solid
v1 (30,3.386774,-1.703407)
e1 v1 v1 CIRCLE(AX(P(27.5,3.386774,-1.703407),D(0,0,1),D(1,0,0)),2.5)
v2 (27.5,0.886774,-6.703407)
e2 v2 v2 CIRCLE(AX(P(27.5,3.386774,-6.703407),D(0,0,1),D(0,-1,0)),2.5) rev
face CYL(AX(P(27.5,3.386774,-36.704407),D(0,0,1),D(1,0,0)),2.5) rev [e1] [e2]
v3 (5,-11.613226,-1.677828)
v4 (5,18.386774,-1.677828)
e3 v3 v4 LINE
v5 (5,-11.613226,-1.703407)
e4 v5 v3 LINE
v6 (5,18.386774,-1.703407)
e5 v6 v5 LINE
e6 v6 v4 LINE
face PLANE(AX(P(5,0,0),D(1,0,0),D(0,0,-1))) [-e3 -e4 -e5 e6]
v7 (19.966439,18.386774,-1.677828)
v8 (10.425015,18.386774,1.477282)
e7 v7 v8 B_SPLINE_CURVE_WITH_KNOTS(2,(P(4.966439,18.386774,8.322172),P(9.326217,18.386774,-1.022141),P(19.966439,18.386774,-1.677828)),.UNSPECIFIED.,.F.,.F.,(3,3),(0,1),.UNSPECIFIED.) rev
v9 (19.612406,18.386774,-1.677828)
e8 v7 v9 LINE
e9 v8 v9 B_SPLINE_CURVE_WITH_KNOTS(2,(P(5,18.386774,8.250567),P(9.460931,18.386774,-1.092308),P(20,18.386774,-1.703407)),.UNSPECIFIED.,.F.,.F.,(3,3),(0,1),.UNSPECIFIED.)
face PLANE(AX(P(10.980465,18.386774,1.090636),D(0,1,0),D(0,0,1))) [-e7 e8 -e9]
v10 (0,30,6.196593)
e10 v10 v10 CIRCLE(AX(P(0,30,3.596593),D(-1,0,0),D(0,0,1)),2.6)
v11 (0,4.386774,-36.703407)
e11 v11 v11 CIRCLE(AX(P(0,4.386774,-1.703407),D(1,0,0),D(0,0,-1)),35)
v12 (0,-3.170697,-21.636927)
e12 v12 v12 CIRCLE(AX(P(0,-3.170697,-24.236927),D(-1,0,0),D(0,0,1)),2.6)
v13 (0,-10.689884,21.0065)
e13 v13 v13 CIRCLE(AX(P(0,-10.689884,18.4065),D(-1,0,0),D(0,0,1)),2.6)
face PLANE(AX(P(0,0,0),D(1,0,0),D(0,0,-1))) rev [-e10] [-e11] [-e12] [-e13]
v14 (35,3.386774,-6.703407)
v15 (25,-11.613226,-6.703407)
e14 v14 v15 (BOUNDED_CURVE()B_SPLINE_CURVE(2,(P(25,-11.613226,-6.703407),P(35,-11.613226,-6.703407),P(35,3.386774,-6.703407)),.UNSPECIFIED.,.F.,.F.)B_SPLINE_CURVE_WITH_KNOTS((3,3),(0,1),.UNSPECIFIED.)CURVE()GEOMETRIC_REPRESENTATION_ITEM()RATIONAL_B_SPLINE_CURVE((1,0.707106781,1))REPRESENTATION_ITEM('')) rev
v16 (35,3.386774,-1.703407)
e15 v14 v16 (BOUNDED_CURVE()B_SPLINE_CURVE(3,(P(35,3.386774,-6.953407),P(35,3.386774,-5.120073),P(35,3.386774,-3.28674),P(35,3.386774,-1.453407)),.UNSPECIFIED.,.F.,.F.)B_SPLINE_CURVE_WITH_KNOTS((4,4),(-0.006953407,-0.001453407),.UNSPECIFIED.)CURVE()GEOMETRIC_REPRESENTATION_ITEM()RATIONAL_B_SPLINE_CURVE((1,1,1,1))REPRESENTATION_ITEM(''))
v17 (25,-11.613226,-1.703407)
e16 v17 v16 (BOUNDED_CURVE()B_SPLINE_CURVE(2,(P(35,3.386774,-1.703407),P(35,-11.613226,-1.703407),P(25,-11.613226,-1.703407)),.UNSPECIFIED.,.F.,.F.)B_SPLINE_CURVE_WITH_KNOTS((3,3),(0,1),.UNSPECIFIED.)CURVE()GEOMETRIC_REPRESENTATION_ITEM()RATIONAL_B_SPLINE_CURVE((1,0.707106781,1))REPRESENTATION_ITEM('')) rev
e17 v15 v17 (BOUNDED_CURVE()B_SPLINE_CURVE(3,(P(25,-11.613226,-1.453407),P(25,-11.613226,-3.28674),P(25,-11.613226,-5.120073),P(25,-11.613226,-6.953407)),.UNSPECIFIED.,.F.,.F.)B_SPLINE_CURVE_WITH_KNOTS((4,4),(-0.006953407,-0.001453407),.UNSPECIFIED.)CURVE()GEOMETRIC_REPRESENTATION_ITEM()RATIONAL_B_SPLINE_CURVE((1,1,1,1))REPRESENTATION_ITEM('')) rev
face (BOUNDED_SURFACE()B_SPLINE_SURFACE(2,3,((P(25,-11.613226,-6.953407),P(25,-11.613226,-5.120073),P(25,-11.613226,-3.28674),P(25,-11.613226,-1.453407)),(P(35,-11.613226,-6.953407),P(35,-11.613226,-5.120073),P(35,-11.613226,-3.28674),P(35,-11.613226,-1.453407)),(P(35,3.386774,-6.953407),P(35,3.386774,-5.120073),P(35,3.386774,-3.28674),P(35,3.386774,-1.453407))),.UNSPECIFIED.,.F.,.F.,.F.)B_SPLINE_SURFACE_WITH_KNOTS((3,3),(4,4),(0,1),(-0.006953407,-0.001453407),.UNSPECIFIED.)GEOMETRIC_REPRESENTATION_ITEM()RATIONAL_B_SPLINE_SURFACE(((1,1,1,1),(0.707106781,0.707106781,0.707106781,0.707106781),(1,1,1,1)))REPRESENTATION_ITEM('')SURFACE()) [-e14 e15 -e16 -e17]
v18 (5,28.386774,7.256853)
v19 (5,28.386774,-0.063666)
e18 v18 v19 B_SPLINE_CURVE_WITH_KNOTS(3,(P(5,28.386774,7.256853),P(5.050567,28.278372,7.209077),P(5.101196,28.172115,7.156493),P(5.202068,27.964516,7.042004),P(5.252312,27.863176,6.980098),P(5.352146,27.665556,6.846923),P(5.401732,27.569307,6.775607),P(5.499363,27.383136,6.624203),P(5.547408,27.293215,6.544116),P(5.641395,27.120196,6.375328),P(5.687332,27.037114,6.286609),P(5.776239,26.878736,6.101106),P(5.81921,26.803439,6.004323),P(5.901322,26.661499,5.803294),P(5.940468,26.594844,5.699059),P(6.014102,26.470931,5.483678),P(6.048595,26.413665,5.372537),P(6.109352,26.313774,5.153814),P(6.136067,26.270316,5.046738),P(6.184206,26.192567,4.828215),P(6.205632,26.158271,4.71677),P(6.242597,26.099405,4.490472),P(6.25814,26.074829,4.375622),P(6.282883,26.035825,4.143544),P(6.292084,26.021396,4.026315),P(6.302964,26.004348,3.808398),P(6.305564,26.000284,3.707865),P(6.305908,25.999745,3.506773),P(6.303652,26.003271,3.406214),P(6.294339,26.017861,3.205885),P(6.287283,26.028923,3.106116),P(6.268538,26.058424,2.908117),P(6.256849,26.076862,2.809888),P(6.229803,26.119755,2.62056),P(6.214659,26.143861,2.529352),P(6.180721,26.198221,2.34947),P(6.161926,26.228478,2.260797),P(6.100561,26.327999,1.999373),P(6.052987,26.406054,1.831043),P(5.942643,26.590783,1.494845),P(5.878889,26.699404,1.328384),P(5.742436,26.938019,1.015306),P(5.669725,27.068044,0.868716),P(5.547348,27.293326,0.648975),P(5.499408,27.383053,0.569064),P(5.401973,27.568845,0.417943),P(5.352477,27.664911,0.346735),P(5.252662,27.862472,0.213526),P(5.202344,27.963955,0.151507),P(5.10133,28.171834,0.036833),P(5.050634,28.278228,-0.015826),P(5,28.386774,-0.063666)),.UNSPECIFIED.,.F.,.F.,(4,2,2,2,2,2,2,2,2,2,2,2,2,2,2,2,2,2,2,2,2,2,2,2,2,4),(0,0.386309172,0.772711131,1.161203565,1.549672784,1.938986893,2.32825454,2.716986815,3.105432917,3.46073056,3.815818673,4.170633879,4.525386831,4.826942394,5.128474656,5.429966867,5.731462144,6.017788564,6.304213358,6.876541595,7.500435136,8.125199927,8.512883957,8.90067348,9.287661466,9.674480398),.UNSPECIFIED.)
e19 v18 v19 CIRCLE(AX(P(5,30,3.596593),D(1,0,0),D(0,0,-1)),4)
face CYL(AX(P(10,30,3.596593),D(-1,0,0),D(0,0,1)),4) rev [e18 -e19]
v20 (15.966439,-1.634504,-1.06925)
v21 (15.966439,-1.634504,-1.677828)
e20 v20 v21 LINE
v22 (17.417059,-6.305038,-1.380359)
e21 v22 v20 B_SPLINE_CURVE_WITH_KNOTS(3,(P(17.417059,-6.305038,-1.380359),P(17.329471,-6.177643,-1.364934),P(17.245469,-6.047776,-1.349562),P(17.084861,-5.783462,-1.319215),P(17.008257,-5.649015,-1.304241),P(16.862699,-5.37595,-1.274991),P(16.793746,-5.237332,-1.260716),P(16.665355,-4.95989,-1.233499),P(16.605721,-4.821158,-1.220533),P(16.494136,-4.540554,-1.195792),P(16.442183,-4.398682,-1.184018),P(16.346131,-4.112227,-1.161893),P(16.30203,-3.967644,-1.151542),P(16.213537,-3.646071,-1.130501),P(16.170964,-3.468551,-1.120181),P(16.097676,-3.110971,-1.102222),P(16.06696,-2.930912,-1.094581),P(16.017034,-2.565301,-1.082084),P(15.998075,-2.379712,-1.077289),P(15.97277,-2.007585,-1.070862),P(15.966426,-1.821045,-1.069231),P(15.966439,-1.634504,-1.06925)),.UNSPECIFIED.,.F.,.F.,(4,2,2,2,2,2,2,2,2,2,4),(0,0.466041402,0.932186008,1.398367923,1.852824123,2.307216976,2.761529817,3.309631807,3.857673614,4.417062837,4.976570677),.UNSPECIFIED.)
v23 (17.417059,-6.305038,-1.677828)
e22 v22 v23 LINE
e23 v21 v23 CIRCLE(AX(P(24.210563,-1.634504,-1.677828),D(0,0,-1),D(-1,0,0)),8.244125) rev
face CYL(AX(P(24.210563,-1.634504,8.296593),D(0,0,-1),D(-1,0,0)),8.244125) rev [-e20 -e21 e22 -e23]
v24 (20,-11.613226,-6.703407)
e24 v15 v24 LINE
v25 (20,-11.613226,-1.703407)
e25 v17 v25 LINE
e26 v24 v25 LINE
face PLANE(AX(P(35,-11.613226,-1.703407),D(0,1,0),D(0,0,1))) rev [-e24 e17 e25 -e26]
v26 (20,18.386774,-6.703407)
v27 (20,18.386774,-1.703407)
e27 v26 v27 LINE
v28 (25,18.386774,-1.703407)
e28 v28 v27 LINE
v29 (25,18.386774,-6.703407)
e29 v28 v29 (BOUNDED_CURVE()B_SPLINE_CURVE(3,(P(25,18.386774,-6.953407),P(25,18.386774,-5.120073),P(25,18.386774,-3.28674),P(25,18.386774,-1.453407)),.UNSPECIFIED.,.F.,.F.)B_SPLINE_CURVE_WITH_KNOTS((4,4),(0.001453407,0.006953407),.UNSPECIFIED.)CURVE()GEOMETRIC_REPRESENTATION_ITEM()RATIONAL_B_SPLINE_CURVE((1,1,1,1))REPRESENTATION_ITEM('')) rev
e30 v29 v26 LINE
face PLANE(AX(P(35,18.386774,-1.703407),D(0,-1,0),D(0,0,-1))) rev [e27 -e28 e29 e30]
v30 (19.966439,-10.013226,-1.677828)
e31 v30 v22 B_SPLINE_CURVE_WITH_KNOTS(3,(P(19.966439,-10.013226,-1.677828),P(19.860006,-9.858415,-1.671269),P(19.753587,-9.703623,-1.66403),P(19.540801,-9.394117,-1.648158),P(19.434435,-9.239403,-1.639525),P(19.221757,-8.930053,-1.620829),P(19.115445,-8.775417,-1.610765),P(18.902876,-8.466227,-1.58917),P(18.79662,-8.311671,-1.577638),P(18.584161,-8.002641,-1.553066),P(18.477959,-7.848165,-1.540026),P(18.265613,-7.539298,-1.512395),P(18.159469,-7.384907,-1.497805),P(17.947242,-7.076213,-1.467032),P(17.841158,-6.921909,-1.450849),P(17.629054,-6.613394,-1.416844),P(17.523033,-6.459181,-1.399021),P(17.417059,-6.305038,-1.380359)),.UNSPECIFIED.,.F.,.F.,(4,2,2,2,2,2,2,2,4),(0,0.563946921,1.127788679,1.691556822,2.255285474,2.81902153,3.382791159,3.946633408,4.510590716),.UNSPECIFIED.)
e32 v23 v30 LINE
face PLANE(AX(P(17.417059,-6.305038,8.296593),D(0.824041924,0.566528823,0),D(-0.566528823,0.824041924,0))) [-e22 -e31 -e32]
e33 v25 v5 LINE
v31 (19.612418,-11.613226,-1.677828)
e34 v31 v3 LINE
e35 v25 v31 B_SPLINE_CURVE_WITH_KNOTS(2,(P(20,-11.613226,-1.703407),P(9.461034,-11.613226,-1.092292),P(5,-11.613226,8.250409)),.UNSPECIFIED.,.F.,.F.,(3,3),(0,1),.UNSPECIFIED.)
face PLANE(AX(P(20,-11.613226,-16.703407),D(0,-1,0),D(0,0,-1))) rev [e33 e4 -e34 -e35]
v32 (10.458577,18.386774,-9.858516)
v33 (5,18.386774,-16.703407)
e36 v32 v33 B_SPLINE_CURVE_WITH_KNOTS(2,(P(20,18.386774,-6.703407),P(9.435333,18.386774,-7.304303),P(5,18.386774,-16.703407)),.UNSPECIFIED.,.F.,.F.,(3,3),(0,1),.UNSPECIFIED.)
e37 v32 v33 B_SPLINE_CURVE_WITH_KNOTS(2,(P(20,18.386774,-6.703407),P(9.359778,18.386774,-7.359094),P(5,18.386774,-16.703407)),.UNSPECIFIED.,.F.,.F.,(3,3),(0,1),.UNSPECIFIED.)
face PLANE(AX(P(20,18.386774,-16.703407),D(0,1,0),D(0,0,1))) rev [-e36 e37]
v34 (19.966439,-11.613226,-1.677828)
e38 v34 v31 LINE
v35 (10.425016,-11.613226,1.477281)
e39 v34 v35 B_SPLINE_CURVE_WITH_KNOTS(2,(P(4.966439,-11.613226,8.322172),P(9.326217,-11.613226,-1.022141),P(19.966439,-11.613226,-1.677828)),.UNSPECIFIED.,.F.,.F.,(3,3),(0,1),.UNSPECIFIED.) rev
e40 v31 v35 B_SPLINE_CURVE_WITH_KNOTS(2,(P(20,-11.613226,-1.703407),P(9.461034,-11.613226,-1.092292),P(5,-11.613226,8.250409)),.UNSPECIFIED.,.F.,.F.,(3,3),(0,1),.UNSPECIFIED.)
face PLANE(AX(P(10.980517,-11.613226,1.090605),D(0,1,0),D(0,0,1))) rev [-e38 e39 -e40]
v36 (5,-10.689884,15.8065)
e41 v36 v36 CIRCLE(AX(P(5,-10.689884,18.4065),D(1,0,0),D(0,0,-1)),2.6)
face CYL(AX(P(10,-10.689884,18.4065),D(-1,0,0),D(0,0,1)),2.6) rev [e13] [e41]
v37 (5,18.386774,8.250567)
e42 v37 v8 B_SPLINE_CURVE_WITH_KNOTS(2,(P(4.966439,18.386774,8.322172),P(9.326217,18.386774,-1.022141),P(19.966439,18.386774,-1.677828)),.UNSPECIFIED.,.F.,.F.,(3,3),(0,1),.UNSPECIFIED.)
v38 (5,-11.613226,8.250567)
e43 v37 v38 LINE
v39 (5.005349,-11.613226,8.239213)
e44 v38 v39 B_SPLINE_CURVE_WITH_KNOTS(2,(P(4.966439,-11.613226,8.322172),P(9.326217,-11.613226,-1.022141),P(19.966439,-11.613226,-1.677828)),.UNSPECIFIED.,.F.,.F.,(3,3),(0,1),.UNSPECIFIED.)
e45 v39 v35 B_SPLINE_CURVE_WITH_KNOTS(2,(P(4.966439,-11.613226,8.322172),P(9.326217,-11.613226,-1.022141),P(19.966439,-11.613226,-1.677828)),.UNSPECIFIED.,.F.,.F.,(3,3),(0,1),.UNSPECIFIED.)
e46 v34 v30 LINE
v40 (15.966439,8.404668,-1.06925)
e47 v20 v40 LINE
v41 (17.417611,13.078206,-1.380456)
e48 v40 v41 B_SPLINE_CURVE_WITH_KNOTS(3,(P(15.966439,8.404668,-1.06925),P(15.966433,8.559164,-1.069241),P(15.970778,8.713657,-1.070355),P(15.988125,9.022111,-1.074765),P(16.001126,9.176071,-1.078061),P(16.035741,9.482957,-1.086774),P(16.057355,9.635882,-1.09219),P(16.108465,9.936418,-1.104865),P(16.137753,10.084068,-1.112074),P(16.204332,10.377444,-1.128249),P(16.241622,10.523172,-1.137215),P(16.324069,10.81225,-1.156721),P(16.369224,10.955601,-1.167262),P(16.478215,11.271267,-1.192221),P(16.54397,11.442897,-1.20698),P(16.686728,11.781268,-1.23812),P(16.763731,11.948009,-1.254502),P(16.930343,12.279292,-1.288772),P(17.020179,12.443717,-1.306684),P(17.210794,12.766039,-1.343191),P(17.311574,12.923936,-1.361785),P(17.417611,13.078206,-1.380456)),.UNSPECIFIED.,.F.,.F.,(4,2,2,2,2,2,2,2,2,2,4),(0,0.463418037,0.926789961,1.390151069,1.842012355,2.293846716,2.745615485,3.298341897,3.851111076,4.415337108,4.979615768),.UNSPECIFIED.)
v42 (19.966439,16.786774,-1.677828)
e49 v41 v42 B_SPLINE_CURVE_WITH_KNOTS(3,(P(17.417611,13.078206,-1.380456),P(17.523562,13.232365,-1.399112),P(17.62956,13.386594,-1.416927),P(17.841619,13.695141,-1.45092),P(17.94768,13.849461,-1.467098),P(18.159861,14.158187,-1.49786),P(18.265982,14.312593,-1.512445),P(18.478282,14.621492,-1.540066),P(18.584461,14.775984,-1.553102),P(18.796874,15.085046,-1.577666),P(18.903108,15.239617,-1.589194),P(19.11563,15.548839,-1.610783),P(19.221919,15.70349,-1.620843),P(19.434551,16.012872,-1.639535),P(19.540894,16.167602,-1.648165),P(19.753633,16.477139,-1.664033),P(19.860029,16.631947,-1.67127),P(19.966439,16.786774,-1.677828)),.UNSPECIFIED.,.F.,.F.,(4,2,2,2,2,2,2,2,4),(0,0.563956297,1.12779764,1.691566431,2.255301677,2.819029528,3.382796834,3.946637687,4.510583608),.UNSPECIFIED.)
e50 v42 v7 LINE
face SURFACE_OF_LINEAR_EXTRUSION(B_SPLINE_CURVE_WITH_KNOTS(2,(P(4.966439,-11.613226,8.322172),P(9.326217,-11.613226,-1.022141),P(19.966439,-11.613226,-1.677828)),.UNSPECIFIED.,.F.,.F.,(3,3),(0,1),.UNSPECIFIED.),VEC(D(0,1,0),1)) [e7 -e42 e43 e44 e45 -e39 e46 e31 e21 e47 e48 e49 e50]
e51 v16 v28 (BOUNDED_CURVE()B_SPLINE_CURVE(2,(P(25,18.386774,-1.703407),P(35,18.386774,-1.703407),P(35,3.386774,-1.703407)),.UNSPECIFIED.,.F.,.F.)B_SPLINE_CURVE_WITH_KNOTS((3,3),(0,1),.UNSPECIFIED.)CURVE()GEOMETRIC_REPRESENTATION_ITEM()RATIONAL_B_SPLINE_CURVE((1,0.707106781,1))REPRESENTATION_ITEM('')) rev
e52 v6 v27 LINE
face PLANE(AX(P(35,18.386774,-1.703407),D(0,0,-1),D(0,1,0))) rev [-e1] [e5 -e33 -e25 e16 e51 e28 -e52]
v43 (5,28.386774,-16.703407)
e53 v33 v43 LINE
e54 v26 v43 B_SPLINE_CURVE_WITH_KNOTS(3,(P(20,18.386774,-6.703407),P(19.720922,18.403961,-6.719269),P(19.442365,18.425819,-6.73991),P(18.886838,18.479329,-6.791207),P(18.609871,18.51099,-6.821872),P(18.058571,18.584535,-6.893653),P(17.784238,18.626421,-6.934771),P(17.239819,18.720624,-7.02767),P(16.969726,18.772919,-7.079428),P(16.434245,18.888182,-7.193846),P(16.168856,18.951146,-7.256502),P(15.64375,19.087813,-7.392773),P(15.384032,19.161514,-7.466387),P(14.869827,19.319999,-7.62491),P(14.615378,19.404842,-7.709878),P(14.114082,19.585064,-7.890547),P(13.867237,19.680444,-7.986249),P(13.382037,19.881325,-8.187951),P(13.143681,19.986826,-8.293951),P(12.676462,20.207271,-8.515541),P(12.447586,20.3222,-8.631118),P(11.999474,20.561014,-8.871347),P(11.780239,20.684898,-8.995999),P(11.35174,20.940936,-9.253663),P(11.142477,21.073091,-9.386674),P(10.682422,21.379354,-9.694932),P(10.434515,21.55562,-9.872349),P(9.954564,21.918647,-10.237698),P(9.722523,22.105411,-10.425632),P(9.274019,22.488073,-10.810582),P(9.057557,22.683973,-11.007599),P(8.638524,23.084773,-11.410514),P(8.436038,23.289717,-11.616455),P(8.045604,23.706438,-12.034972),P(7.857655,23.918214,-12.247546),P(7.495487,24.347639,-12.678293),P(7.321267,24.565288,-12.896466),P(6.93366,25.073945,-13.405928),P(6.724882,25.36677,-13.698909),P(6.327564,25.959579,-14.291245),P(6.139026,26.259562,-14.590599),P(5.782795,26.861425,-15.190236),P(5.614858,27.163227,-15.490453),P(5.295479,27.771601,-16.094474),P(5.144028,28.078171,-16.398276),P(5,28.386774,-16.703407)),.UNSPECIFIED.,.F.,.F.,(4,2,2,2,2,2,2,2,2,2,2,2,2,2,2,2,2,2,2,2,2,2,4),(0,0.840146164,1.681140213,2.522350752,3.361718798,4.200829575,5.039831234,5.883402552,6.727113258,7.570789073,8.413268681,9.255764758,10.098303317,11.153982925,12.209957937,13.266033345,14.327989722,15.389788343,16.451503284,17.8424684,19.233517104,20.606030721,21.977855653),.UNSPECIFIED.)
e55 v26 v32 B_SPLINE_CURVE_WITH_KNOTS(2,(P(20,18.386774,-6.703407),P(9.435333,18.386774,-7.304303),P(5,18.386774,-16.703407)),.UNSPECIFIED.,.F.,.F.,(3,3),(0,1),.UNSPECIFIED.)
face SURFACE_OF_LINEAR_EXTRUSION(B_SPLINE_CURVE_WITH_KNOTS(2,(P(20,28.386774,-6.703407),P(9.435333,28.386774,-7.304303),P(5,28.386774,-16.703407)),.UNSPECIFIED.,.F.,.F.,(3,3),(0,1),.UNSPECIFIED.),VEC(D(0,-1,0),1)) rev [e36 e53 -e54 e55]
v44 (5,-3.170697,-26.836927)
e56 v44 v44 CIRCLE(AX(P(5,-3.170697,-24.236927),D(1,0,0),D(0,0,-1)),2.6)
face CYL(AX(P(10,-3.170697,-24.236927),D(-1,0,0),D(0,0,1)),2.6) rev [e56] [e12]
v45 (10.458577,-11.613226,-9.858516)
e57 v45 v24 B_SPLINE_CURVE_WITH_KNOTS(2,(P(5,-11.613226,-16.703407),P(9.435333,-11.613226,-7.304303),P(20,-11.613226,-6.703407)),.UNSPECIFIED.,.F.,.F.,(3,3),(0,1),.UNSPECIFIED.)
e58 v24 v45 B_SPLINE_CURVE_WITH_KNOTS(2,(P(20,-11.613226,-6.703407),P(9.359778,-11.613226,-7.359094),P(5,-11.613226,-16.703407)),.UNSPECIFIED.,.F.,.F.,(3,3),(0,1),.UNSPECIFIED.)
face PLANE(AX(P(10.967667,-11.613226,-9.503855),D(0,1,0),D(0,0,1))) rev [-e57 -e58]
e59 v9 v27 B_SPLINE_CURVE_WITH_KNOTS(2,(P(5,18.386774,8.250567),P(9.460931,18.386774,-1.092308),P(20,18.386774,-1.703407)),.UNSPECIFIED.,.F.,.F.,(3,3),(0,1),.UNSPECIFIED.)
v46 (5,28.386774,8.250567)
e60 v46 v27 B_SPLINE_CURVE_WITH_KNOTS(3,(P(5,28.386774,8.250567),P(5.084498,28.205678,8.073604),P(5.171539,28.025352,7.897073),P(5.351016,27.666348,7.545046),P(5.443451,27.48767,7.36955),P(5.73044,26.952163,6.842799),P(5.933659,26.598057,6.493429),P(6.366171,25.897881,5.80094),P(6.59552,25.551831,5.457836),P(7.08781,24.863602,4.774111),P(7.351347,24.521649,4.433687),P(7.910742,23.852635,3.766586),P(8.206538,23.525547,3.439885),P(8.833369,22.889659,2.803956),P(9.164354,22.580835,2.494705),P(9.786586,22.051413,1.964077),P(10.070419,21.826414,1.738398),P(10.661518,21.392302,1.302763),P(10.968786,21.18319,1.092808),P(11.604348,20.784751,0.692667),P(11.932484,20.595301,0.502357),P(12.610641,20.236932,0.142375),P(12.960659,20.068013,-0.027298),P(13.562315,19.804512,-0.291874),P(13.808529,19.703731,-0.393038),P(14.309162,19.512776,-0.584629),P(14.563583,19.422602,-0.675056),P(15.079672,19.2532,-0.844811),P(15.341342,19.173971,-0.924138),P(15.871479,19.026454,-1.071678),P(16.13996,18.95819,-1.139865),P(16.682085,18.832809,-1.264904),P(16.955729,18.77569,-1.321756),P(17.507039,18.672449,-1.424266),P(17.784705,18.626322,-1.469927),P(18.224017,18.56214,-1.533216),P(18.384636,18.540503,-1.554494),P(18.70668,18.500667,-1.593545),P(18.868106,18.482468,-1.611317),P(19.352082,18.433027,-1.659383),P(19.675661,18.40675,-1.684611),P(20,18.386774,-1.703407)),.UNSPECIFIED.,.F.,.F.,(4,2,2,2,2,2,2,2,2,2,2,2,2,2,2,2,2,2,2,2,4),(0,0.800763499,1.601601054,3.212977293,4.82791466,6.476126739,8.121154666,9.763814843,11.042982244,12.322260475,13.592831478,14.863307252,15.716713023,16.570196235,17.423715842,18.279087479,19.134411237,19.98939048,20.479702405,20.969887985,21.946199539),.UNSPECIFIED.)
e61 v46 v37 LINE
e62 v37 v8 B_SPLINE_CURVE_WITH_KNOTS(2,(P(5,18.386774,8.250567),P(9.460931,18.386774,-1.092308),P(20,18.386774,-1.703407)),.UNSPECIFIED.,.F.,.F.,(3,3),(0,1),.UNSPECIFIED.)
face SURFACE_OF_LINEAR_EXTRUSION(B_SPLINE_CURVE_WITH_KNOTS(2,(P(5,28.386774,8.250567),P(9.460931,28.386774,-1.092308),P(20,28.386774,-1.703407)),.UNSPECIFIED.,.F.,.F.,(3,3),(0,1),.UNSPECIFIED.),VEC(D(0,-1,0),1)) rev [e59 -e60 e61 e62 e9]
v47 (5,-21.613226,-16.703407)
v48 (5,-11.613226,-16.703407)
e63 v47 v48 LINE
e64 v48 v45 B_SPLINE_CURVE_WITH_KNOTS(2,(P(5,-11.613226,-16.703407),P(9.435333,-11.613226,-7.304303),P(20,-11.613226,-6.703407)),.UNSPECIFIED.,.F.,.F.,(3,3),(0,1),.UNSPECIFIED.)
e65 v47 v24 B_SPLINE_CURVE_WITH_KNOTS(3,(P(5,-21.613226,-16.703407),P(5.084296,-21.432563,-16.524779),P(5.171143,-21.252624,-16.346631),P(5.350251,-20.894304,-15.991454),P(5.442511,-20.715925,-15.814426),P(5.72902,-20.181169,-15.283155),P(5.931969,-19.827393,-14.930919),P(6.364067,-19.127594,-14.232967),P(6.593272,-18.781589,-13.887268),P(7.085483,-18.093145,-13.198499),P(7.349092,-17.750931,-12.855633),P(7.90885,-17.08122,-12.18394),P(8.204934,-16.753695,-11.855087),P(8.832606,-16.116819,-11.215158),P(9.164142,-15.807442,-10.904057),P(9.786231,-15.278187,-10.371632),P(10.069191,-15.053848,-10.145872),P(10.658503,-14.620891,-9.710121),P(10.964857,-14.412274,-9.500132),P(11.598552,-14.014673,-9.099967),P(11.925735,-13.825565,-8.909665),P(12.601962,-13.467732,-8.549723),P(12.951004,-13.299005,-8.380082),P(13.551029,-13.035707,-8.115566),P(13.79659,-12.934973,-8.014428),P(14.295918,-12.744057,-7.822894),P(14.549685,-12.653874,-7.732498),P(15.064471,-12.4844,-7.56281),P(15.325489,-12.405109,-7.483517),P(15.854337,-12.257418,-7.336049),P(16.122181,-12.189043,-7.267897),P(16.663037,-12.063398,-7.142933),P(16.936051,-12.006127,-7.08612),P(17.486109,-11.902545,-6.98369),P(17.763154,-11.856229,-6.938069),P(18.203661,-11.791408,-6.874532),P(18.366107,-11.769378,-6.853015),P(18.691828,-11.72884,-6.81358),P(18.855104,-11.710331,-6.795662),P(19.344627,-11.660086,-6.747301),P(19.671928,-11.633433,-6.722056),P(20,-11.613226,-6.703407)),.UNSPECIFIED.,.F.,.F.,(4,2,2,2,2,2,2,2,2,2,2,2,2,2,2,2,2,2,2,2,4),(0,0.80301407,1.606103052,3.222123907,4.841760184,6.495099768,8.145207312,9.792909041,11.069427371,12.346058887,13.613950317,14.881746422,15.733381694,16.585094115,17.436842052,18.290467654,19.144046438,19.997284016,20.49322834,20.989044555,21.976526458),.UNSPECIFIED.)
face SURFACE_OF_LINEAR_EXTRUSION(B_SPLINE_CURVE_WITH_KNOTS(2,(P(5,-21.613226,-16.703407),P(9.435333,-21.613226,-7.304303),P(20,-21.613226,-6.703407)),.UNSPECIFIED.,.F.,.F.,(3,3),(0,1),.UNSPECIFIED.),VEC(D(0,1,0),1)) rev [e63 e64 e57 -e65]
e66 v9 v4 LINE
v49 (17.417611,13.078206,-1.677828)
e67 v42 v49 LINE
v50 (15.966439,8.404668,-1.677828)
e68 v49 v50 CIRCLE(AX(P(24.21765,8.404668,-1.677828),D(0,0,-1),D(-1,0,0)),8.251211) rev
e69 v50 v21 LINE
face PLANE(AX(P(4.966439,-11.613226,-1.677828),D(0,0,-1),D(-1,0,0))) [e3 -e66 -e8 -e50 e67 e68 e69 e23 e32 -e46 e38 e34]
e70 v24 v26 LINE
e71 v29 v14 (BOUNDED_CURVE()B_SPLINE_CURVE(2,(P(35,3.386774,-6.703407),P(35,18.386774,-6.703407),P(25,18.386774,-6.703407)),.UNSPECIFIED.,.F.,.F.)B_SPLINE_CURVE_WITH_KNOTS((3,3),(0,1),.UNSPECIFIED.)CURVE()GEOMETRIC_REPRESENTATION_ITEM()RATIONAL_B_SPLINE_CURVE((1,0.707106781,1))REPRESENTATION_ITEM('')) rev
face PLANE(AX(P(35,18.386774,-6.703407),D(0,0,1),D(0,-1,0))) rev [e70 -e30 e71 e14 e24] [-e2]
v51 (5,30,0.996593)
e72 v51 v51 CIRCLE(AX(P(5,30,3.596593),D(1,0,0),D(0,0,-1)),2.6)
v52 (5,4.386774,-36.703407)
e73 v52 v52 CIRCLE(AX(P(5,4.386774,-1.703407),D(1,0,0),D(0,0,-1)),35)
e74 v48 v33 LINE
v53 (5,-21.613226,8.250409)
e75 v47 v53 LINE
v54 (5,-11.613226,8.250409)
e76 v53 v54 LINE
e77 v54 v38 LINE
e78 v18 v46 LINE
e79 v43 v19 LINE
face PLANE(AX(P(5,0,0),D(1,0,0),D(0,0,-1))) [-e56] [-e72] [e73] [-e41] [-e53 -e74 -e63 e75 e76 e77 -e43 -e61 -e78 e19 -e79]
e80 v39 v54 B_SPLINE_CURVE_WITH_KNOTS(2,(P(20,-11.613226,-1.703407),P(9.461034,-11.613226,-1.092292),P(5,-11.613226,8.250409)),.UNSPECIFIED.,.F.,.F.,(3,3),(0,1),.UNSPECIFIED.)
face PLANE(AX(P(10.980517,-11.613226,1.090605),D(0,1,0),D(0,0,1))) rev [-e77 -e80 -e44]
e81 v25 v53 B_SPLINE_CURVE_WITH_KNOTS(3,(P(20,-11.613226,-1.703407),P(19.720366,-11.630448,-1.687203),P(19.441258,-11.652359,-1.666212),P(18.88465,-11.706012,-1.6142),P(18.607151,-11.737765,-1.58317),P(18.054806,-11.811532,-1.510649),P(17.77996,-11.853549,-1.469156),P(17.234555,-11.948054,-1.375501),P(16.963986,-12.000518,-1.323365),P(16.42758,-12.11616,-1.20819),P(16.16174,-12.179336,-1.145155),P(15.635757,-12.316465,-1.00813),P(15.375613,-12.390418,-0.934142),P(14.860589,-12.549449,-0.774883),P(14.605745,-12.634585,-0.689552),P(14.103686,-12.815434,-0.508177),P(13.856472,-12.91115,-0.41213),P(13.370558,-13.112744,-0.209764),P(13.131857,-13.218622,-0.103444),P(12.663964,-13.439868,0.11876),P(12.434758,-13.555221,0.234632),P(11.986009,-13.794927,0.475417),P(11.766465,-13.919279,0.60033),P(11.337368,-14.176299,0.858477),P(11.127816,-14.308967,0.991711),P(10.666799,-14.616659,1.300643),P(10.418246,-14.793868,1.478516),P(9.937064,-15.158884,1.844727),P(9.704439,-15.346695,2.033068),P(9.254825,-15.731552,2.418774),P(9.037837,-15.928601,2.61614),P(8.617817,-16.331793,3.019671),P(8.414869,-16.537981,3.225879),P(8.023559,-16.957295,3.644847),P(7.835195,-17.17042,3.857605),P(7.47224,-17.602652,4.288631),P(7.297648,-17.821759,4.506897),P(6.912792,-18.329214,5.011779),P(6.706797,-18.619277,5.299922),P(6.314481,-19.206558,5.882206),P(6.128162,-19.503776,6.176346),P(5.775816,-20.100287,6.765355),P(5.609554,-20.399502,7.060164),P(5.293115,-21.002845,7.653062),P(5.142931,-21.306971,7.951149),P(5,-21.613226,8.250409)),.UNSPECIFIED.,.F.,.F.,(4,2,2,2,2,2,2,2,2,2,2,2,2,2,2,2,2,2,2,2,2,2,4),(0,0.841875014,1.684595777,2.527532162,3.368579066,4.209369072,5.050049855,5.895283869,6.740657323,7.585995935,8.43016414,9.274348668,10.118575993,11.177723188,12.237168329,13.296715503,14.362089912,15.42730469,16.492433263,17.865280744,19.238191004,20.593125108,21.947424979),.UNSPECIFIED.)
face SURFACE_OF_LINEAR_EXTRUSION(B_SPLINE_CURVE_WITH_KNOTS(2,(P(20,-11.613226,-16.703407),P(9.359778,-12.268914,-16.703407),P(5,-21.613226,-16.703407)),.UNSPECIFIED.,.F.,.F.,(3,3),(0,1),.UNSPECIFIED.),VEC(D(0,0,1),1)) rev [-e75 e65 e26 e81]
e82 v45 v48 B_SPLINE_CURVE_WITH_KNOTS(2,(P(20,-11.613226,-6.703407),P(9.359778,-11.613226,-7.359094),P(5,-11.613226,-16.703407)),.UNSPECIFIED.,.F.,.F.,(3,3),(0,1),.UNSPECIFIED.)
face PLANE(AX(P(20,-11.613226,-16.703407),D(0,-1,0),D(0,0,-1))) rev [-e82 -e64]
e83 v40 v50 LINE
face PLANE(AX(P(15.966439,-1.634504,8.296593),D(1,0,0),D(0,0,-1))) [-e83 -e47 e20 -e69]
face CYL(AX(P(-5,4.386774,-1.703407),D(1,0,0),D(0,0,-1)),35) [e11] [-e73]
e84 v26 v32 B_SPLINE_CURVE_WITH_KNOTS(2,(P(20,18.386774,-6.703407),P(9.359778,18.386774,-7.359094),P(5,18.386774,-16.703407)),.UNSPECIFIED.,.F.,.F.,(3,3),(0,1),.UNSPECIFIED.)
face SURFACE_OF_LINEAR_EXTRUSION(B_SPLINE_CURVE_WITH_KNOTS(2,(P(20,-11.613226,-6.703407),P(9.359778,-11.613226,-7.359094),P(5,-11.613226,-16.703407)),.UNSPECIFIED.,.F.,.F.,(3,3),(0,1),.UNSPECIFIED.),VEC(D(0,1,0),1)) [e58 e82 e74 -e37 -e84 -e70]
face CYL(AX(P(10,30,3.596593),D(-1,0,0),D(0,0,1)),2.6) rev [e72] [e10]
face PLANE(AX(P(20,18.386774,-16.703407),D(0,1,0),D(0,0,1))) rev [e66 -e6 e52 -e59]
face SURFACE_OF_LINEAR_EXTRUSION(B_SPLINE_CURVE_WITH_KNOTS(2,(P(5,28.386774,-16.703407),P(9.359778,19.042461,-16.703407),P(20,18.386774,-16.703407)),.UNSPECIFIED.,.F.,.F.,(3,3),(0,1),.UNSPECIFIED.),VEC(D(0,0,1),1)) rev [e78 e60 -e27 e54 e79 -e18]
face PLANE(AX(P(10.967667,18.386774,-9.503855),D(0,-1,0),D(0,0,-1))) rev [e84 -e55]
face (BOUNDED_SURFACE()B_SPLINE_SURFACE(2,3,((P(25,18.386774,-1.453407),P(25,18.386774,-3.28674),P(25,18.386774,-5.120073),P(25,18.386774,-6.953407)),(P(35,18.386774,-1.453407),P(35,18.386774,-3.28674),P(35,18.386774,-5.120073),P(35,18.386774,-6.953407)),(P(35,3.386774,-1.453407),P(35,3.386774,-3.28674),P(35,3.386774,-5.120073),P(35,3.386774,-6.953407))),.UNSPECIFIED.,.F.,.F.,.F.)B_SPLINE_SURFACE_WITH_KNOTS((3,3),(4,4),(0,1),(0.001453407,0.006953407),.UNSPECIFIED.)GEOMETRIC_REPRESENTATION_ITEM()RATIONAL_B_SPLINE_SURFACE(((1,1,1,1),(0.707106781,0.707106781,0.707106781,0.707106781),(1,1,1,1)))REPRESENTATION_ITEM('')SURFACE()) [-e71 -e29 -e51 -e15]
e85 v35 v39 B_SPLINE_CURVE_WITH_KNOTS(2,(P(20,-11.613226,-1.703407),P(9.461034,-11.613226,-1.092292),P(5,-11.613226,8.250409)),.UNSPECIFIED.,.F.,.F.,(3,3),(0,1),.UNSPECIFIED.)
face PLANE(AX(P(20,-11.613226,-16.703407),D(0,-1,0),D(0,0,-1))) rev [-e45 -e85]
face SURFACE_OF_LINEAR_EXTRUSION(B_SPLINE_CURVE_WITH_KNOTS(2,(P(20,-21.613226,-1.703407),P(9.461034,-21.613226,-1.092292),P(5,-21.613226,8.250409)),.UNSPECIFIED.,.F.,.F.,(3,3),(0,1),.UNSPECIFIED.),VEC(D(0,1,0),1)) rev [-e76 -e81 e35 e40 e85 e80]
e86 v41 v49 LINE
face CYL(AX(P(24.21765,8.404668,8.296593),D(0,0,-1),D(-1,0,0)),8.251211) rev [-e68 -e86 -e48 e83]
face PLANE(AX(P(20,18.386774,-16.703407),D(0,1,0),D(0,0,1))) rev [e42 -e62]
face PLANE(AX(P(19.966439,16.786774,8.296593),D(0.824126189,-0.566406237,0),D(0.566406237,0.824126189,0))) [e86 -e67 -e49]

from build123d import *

# Parameters (mm, degrees)
SKIZZE1_W                            = 100
SKIZZE1_H                            = 100
AUFSATZ_LINEAR_AUSTRAGEN1_DEPTH      = 5
SKIZZE4_R                            = 2.6
SCHNITT_LINEAR_AUSTRAGEN1_DEPTH      = 10
SKIZZE5_W                            = 100
SKIZZE5_H                            = 100
SKIZZE5_R                            = 35
SCHNITT_LINEAR_AUSTRAGEN2_DEPTH      = 10
SKIZZE6_W                            = 5
SKIZZE6_H                            = 30
AUFSATZ_LINEAR_AUSTRAGEN2_DEPTH      = 30
SCHNITT_LINEAR_AUSTRAGEN3_REACH      = 65.256
SKIZZE7_R                            = 2.5
AUFSATZ_LINEAR_AUSTRAGEN3_DEPTH      = 30
AUFSATZ_LINEAR_AUSTRAGEN4_DEPTH      = 10
AUFSATZ_LINEAR_AUSTRAGEN4_DEPTH_BACK = 15
SCHNITT_LINEAR_AUSTRAGEN5_DEPTH      = 10
SCHNITT_LINEAR_AUSTRAGEN6_DEPTH      = 10
SKIZZE13_R                           = 4
SCHNITT_LINEAR_AUSTRAGEN7_DEPTH      = 5
VERRUNDUNG1_SIZE                     = 10
VERRUNDUNG1_SIZE_2                   = 15
VERRUNDUNG2_SIZE                     = 10
VERRUNDUNG2_SIZE_2                   = 15
SCHNITT_LINEAR_AUSTRAGEN8_DEPTH      = 10


with BuildPart() as part:
    # Skizze1 → Aufsatz-Linear austragen1 (new body)
    with BuildSketch(Plane(origin=(0, 0, 0), x_dir=(0, 0, -1), z_dir=(1, 0, 0))):
        with Locations((1.703406814, -6.613226453)):
            Rectangle(SKIZZE1_W, SKIZZE1_H)
    extrude(amount=AUFSATZ_LINEAR_AUSTRAGEN1_DEPTH)

    # Skizze4 → Schnitt-Linear austragen1 (cut)
    with BuildSketch(Plane.ZY):
        with Locations((3.596593186, 30)):
            Circle(SKIZZE4_R)
        with Locations((18.406499823, -10.689884067)):
            Circle(SKIZZE4_R)
        with Locations((-24.236926775, -3.170697408)):
            Circle(SKIZZE4_R)
    extrude(amount=-SCHNITT_LINEAR_AUSTRAGEN1_DEPTH, mode=Mode.SUBTRACT)

    # Skizze5 → Schnitt-Linear austragen2 (cut)
    with BuildSketch(Plane(origin=(5, 0, 0), x_dir=(0, 0, -1), z_dir=(1, 0, 0))):
        with Locations((1.703406814, -6.613226453)):
            Rectangle(SKIZZE5_W, SKIZZE5_H)
        with Locations((1.703406814, 4.386773547)):
            Circle(SKIZZE5_R, mode=Mode.SUBTRACT)
    extrude(amount=-SCHNITT_LINEAR_AUSTRAGEN2_DEPTH, mode=Mode.SUBTRACT)

    # Skizze6 → Aufsatz-Linear austragen2 (add)
    with BuildSketch(Plane(origin=(5, 0, 0), x_dir=(0, 0, -1), z_dir=(1, 0, 0))):
        with Locations((4.203406814, 3.386773547)):
            Rectangle(SKIZZE6_W, SKIZZE6_H)
    extrude(amount=AUFSATZ_LINEAR_AUSTRAGEN2_DEPTH)

    # Skizze7 → Schnitt-Linear austragen3 (cut, up to next)
    with BuildSketch(Plane.XY.offset(-1.703406814), mode=Mode.PRIVATE) as schnitt_linear_austragen3_sk1:
        with Locations((27.5, 3.386773547)):
            Circle(SKIZZE7_R)
    schnitt_linear_austragen3_tool1 = extrude(schnitt_linear_austragen3_sk1.sketch, amount=-SCHNITT_LINEAR_AUSTRAGEN3_REACH, mode=Mode.PRIVATE) & part.part
    add(schnitt_linear_austragen3_tool1.solids().sort_by_distance((27.5, 3.386774, -1.703407))[0], mode=Mode.SUBTRACT)

    # Skizze8 → Aufsatz-Linear austragen3 (add)
    with BuildSketch(Plane(origin=(0, 18.386773547, 0), x_dir=(1, 0, 0), z_dir=(0, 1, 0))):
        with BuildLine():
            Line((4.966438821, 1.677827842), (19.966438821, 1.677827842))
            add(Edge.make_bspline(
                [(4.966438821, -8.322172158), (9.326216657, 1.022140691), (19.966438821, 1.677827842)],
                knots=[0, 0, 0, 1, 1, 1], degree=2))
            Line((4.966438821, -8.322172158), (4.966438821, 1.677827842))
        make_face()
        with BuildLine():
            Line((5, 6.703406814), (20, 6.703406814))
            add(Edge.make_bspline(
                [(5, 16.703406814), (9.359777836, 7.359093965), (20, 6.703406814)],
                knots=[0, 0, 0, 1, 1, 1], degree=2))
            Line((5, 16.703406814), (5, 6.703406814))
        make_face()
    extrude(amount=-AUFSATZ_LINEAR_AUSTRAGEN3_DEPTH)

    # Skizze10 → Aufsatz-Linear austragen4 (add, two sides: drawn at the far end of the back side and taken through both)
    with BuildSketch(Plane(origin=(0, 0, -6.703406814), x_dir=(-1, 0, 0), z_dir=(0, 0, -1)).offset(-AUFSATZ_LINEAR_AUSTRAGEN4_DEPTH_BACK)):
        with BuildLine():
            Line((-20, 18.386773547), (-5, 18.386773547))
            Line((-5, 18.386773547), (-5, 28.386773547))
            add(Edge.make_bspline(
                [(-5, 28.386773547), (-9.359777836, 19.042460698), (-20, 18.386773547)],
                knots=[0, 0, 0, 1, 1, 1], degree=2))
        make_face()
        with BuildLine():
            Line((-20, -11.613226453), (-5, -11.613226453))
            Line((-5, -11.613226453), (-5, -21.613226453))
            add(Edge.make_bspline(
                [(-20, -11.613226453), (-9.359777836, -12.268913604), (-5, -21.613226453)],
                knots=[0, 0, 0, 1, 1, 1], degree=2))
        make_face()
    extrude(amount=AUFSATZ_LINEAR_AUSTRAGEN4_DEPTH + AUFSATZ_LINEAR_AUSTRAGEN4_DEPTH_BACK)

    # Skizze11 → Schnitt-Linear austragen5 (cut)
    with BuildSketch(Plane.XZ.offset(-18.386773547)):
        with BuildLine():
            Line((5, 8.296593186), (19.36962833, 8.296593186))
            Line((19.36962833, 8.296593186), (20, -1.703406814))
            add(Edge.make_bspline(
                [(4.99999999, 8.250566821), (9.460930964, -1.092308009), (20, -1.703406814)],
                knots=[0, 0, 0, 1, 1, 1], degree=2))
            Line((4.99999999, 8.250566821), (5, 8.296593186))
        make_face()
        with BuildLine():
            Line((5, -16.703406814), (20, -16.703406814))
            Line((20, -16.703406814), (20, -6.703406814))
            add(Edge.make_bspline(
                [(5, -16.703406814), (9.435333182, -7.304303218), (20, -6.703406814)],
                knots=[0, 0, 0, 1, 1, 1], degree=2))
        make_face()
    extrude(amount=-SCHNITT_LINEAR_AUSTRAGEN5_DEPTH, mode=Mode.SUBTRACT)


with BuildPart() as schnitt_linear_austragen5_kept_piece:
    # of the separate pieces the step leaves, the one the design keeps (schnitt_linear_austragen5_pieces_kept)
    add(part.part.solids().sort_by_distance((0, 4.386773547, -36.703406814))[0])

    # Skizze12 → Schnitt-Linear austragen6 (cut)
    with BuildSketch(Plane(origin=(0, -11.613226453, 0), x_dir=(1, 0, 0), z_dir=(0, 1, 0))):
        with BuildLine():
            Line((20, 6.703406814), (20, 16.703406814))
            Line((20, 16.703406814), (5, 16.703406814))
            add(Edge.make_bspline(
                [(20, 6.703406814), (9.435333182, 7.304303218), (5, 16.703406814)],
                knots=[0, 0, 0, 1, 1, 1], degree=2))
        make_face()
        with BuildLine():
            Line((5, -8.296593186), (20, -8.296593186))
            Line((20, -8.296593186), (20, 1.703406814))
            add(Edge.make_bspline(
                [(5, -8.250408851), (9.461034282, 1.092291552), (20, 1.703406814)],
                knots=[0, 0, 0, 1, 1, 1], degree=2))
            Line((5, -8.250408851), (5, -8.296593186))
        make_face()
    extrude(amount=-SCHNITT_LINEAR_AUSTRAGEN6_DEPTH, mode=Mode.SUBTRACT)

    # Skizze13 → Schnitt-Linear austragen7 (cut)
    with BuildSketch(Plane(origin=(5, 0, 0), x_dir=(0, 0, -1), z_dir=(1, 0, 0))):
        with Locations((-3.596593186, 30)):
            Circle(SKIZZE13_R)
    extrude(amount=SCHNITT_LINEAR_AUSTRAGEN7_DEPTH, mode=Mode.SUBTRACT)

    # Verrundung1
    # an asymmetric fillet: 15, 10 mm, written as the material it takes off along each edge
    with BuildSketch(Plane(origin=(35, 18.386773547, 35.796593186), x_dir=(-1, 0, 0), z_dir=(0, 0, -1))) as verrundung1_piece_1:
        with BuildLine():
            Bezier((VERRUNDUNG1_SIZE, 0), (0, 0), (0, -VERRUNDUNG1_SIZE_2), weights=[1, 0.707106781, 1])
            Line((0, -VERRUNDUNG1_SIZE_2), (0, 0))
            Line((0, 0), (VERRUNDUNG1_SIZE, 0))
        make_face()
    extrude(amount=80, mode=Mode.SUBTRACT)

    # Verrundung2
    # an asymmetric fillet: 15, 10 mm, written as the material it takes off along each edge
    with BuildSketch(Plane(origin=(35, -11.613226453, -44.203406814), x_dir=(-1, 0, 0), z_dir=(0, 0, 1))) as verrundung2_piece_1:
        with BuildLine():
            Bezier((VERRUNDUNG2_SIZE, 0), (0, 0), (0, -VERRUNDUNG2_SIZE_2), weights=[1, 0.707106781, 1])
            Line((0, -VERRUNDUNG2_SIZE_2), (0, 0))
            Line((0, 0), (VERRUNDUNG2_SIZE, 0))
        make_face()
    extrude(amount=80, mode=Mode.SUBTRACT)

    # Skizze14 → Schnitt-Linear austragen8 (cut)
    with BuildSketch(Plane.XY.offset(-1.703406814)):
        with BuildLine():
            Line((19.966438821, 16.786773547), (17.417610755, 13.078205698))
            ThreePointArc((17.417610755, 13.078205698), (16.337578752, 10.851495421), (15.966438821, 8.404668304))
            Line((15.966438821, 8.404668304), (15.966438821, -1.634503602))
            ThreePointArc((15.966438821, -1.634503602), (16.337441855, -4.079814875), (17.417059118, -6.305037794))
            Line((17.417059118, -6.305037794), (19.966438821, -10.013226453))
            Line((19.966438821, -10.013226453), (19.966438821, 16.786773547))
        make_face()
    extrude(amount=SCHNITT_LINEAR_AUSTRAGEN8_DEPTH, mode=Mode.SUBTRACT)


solid = schnitt_linear_austragen5_kept_piece.part
